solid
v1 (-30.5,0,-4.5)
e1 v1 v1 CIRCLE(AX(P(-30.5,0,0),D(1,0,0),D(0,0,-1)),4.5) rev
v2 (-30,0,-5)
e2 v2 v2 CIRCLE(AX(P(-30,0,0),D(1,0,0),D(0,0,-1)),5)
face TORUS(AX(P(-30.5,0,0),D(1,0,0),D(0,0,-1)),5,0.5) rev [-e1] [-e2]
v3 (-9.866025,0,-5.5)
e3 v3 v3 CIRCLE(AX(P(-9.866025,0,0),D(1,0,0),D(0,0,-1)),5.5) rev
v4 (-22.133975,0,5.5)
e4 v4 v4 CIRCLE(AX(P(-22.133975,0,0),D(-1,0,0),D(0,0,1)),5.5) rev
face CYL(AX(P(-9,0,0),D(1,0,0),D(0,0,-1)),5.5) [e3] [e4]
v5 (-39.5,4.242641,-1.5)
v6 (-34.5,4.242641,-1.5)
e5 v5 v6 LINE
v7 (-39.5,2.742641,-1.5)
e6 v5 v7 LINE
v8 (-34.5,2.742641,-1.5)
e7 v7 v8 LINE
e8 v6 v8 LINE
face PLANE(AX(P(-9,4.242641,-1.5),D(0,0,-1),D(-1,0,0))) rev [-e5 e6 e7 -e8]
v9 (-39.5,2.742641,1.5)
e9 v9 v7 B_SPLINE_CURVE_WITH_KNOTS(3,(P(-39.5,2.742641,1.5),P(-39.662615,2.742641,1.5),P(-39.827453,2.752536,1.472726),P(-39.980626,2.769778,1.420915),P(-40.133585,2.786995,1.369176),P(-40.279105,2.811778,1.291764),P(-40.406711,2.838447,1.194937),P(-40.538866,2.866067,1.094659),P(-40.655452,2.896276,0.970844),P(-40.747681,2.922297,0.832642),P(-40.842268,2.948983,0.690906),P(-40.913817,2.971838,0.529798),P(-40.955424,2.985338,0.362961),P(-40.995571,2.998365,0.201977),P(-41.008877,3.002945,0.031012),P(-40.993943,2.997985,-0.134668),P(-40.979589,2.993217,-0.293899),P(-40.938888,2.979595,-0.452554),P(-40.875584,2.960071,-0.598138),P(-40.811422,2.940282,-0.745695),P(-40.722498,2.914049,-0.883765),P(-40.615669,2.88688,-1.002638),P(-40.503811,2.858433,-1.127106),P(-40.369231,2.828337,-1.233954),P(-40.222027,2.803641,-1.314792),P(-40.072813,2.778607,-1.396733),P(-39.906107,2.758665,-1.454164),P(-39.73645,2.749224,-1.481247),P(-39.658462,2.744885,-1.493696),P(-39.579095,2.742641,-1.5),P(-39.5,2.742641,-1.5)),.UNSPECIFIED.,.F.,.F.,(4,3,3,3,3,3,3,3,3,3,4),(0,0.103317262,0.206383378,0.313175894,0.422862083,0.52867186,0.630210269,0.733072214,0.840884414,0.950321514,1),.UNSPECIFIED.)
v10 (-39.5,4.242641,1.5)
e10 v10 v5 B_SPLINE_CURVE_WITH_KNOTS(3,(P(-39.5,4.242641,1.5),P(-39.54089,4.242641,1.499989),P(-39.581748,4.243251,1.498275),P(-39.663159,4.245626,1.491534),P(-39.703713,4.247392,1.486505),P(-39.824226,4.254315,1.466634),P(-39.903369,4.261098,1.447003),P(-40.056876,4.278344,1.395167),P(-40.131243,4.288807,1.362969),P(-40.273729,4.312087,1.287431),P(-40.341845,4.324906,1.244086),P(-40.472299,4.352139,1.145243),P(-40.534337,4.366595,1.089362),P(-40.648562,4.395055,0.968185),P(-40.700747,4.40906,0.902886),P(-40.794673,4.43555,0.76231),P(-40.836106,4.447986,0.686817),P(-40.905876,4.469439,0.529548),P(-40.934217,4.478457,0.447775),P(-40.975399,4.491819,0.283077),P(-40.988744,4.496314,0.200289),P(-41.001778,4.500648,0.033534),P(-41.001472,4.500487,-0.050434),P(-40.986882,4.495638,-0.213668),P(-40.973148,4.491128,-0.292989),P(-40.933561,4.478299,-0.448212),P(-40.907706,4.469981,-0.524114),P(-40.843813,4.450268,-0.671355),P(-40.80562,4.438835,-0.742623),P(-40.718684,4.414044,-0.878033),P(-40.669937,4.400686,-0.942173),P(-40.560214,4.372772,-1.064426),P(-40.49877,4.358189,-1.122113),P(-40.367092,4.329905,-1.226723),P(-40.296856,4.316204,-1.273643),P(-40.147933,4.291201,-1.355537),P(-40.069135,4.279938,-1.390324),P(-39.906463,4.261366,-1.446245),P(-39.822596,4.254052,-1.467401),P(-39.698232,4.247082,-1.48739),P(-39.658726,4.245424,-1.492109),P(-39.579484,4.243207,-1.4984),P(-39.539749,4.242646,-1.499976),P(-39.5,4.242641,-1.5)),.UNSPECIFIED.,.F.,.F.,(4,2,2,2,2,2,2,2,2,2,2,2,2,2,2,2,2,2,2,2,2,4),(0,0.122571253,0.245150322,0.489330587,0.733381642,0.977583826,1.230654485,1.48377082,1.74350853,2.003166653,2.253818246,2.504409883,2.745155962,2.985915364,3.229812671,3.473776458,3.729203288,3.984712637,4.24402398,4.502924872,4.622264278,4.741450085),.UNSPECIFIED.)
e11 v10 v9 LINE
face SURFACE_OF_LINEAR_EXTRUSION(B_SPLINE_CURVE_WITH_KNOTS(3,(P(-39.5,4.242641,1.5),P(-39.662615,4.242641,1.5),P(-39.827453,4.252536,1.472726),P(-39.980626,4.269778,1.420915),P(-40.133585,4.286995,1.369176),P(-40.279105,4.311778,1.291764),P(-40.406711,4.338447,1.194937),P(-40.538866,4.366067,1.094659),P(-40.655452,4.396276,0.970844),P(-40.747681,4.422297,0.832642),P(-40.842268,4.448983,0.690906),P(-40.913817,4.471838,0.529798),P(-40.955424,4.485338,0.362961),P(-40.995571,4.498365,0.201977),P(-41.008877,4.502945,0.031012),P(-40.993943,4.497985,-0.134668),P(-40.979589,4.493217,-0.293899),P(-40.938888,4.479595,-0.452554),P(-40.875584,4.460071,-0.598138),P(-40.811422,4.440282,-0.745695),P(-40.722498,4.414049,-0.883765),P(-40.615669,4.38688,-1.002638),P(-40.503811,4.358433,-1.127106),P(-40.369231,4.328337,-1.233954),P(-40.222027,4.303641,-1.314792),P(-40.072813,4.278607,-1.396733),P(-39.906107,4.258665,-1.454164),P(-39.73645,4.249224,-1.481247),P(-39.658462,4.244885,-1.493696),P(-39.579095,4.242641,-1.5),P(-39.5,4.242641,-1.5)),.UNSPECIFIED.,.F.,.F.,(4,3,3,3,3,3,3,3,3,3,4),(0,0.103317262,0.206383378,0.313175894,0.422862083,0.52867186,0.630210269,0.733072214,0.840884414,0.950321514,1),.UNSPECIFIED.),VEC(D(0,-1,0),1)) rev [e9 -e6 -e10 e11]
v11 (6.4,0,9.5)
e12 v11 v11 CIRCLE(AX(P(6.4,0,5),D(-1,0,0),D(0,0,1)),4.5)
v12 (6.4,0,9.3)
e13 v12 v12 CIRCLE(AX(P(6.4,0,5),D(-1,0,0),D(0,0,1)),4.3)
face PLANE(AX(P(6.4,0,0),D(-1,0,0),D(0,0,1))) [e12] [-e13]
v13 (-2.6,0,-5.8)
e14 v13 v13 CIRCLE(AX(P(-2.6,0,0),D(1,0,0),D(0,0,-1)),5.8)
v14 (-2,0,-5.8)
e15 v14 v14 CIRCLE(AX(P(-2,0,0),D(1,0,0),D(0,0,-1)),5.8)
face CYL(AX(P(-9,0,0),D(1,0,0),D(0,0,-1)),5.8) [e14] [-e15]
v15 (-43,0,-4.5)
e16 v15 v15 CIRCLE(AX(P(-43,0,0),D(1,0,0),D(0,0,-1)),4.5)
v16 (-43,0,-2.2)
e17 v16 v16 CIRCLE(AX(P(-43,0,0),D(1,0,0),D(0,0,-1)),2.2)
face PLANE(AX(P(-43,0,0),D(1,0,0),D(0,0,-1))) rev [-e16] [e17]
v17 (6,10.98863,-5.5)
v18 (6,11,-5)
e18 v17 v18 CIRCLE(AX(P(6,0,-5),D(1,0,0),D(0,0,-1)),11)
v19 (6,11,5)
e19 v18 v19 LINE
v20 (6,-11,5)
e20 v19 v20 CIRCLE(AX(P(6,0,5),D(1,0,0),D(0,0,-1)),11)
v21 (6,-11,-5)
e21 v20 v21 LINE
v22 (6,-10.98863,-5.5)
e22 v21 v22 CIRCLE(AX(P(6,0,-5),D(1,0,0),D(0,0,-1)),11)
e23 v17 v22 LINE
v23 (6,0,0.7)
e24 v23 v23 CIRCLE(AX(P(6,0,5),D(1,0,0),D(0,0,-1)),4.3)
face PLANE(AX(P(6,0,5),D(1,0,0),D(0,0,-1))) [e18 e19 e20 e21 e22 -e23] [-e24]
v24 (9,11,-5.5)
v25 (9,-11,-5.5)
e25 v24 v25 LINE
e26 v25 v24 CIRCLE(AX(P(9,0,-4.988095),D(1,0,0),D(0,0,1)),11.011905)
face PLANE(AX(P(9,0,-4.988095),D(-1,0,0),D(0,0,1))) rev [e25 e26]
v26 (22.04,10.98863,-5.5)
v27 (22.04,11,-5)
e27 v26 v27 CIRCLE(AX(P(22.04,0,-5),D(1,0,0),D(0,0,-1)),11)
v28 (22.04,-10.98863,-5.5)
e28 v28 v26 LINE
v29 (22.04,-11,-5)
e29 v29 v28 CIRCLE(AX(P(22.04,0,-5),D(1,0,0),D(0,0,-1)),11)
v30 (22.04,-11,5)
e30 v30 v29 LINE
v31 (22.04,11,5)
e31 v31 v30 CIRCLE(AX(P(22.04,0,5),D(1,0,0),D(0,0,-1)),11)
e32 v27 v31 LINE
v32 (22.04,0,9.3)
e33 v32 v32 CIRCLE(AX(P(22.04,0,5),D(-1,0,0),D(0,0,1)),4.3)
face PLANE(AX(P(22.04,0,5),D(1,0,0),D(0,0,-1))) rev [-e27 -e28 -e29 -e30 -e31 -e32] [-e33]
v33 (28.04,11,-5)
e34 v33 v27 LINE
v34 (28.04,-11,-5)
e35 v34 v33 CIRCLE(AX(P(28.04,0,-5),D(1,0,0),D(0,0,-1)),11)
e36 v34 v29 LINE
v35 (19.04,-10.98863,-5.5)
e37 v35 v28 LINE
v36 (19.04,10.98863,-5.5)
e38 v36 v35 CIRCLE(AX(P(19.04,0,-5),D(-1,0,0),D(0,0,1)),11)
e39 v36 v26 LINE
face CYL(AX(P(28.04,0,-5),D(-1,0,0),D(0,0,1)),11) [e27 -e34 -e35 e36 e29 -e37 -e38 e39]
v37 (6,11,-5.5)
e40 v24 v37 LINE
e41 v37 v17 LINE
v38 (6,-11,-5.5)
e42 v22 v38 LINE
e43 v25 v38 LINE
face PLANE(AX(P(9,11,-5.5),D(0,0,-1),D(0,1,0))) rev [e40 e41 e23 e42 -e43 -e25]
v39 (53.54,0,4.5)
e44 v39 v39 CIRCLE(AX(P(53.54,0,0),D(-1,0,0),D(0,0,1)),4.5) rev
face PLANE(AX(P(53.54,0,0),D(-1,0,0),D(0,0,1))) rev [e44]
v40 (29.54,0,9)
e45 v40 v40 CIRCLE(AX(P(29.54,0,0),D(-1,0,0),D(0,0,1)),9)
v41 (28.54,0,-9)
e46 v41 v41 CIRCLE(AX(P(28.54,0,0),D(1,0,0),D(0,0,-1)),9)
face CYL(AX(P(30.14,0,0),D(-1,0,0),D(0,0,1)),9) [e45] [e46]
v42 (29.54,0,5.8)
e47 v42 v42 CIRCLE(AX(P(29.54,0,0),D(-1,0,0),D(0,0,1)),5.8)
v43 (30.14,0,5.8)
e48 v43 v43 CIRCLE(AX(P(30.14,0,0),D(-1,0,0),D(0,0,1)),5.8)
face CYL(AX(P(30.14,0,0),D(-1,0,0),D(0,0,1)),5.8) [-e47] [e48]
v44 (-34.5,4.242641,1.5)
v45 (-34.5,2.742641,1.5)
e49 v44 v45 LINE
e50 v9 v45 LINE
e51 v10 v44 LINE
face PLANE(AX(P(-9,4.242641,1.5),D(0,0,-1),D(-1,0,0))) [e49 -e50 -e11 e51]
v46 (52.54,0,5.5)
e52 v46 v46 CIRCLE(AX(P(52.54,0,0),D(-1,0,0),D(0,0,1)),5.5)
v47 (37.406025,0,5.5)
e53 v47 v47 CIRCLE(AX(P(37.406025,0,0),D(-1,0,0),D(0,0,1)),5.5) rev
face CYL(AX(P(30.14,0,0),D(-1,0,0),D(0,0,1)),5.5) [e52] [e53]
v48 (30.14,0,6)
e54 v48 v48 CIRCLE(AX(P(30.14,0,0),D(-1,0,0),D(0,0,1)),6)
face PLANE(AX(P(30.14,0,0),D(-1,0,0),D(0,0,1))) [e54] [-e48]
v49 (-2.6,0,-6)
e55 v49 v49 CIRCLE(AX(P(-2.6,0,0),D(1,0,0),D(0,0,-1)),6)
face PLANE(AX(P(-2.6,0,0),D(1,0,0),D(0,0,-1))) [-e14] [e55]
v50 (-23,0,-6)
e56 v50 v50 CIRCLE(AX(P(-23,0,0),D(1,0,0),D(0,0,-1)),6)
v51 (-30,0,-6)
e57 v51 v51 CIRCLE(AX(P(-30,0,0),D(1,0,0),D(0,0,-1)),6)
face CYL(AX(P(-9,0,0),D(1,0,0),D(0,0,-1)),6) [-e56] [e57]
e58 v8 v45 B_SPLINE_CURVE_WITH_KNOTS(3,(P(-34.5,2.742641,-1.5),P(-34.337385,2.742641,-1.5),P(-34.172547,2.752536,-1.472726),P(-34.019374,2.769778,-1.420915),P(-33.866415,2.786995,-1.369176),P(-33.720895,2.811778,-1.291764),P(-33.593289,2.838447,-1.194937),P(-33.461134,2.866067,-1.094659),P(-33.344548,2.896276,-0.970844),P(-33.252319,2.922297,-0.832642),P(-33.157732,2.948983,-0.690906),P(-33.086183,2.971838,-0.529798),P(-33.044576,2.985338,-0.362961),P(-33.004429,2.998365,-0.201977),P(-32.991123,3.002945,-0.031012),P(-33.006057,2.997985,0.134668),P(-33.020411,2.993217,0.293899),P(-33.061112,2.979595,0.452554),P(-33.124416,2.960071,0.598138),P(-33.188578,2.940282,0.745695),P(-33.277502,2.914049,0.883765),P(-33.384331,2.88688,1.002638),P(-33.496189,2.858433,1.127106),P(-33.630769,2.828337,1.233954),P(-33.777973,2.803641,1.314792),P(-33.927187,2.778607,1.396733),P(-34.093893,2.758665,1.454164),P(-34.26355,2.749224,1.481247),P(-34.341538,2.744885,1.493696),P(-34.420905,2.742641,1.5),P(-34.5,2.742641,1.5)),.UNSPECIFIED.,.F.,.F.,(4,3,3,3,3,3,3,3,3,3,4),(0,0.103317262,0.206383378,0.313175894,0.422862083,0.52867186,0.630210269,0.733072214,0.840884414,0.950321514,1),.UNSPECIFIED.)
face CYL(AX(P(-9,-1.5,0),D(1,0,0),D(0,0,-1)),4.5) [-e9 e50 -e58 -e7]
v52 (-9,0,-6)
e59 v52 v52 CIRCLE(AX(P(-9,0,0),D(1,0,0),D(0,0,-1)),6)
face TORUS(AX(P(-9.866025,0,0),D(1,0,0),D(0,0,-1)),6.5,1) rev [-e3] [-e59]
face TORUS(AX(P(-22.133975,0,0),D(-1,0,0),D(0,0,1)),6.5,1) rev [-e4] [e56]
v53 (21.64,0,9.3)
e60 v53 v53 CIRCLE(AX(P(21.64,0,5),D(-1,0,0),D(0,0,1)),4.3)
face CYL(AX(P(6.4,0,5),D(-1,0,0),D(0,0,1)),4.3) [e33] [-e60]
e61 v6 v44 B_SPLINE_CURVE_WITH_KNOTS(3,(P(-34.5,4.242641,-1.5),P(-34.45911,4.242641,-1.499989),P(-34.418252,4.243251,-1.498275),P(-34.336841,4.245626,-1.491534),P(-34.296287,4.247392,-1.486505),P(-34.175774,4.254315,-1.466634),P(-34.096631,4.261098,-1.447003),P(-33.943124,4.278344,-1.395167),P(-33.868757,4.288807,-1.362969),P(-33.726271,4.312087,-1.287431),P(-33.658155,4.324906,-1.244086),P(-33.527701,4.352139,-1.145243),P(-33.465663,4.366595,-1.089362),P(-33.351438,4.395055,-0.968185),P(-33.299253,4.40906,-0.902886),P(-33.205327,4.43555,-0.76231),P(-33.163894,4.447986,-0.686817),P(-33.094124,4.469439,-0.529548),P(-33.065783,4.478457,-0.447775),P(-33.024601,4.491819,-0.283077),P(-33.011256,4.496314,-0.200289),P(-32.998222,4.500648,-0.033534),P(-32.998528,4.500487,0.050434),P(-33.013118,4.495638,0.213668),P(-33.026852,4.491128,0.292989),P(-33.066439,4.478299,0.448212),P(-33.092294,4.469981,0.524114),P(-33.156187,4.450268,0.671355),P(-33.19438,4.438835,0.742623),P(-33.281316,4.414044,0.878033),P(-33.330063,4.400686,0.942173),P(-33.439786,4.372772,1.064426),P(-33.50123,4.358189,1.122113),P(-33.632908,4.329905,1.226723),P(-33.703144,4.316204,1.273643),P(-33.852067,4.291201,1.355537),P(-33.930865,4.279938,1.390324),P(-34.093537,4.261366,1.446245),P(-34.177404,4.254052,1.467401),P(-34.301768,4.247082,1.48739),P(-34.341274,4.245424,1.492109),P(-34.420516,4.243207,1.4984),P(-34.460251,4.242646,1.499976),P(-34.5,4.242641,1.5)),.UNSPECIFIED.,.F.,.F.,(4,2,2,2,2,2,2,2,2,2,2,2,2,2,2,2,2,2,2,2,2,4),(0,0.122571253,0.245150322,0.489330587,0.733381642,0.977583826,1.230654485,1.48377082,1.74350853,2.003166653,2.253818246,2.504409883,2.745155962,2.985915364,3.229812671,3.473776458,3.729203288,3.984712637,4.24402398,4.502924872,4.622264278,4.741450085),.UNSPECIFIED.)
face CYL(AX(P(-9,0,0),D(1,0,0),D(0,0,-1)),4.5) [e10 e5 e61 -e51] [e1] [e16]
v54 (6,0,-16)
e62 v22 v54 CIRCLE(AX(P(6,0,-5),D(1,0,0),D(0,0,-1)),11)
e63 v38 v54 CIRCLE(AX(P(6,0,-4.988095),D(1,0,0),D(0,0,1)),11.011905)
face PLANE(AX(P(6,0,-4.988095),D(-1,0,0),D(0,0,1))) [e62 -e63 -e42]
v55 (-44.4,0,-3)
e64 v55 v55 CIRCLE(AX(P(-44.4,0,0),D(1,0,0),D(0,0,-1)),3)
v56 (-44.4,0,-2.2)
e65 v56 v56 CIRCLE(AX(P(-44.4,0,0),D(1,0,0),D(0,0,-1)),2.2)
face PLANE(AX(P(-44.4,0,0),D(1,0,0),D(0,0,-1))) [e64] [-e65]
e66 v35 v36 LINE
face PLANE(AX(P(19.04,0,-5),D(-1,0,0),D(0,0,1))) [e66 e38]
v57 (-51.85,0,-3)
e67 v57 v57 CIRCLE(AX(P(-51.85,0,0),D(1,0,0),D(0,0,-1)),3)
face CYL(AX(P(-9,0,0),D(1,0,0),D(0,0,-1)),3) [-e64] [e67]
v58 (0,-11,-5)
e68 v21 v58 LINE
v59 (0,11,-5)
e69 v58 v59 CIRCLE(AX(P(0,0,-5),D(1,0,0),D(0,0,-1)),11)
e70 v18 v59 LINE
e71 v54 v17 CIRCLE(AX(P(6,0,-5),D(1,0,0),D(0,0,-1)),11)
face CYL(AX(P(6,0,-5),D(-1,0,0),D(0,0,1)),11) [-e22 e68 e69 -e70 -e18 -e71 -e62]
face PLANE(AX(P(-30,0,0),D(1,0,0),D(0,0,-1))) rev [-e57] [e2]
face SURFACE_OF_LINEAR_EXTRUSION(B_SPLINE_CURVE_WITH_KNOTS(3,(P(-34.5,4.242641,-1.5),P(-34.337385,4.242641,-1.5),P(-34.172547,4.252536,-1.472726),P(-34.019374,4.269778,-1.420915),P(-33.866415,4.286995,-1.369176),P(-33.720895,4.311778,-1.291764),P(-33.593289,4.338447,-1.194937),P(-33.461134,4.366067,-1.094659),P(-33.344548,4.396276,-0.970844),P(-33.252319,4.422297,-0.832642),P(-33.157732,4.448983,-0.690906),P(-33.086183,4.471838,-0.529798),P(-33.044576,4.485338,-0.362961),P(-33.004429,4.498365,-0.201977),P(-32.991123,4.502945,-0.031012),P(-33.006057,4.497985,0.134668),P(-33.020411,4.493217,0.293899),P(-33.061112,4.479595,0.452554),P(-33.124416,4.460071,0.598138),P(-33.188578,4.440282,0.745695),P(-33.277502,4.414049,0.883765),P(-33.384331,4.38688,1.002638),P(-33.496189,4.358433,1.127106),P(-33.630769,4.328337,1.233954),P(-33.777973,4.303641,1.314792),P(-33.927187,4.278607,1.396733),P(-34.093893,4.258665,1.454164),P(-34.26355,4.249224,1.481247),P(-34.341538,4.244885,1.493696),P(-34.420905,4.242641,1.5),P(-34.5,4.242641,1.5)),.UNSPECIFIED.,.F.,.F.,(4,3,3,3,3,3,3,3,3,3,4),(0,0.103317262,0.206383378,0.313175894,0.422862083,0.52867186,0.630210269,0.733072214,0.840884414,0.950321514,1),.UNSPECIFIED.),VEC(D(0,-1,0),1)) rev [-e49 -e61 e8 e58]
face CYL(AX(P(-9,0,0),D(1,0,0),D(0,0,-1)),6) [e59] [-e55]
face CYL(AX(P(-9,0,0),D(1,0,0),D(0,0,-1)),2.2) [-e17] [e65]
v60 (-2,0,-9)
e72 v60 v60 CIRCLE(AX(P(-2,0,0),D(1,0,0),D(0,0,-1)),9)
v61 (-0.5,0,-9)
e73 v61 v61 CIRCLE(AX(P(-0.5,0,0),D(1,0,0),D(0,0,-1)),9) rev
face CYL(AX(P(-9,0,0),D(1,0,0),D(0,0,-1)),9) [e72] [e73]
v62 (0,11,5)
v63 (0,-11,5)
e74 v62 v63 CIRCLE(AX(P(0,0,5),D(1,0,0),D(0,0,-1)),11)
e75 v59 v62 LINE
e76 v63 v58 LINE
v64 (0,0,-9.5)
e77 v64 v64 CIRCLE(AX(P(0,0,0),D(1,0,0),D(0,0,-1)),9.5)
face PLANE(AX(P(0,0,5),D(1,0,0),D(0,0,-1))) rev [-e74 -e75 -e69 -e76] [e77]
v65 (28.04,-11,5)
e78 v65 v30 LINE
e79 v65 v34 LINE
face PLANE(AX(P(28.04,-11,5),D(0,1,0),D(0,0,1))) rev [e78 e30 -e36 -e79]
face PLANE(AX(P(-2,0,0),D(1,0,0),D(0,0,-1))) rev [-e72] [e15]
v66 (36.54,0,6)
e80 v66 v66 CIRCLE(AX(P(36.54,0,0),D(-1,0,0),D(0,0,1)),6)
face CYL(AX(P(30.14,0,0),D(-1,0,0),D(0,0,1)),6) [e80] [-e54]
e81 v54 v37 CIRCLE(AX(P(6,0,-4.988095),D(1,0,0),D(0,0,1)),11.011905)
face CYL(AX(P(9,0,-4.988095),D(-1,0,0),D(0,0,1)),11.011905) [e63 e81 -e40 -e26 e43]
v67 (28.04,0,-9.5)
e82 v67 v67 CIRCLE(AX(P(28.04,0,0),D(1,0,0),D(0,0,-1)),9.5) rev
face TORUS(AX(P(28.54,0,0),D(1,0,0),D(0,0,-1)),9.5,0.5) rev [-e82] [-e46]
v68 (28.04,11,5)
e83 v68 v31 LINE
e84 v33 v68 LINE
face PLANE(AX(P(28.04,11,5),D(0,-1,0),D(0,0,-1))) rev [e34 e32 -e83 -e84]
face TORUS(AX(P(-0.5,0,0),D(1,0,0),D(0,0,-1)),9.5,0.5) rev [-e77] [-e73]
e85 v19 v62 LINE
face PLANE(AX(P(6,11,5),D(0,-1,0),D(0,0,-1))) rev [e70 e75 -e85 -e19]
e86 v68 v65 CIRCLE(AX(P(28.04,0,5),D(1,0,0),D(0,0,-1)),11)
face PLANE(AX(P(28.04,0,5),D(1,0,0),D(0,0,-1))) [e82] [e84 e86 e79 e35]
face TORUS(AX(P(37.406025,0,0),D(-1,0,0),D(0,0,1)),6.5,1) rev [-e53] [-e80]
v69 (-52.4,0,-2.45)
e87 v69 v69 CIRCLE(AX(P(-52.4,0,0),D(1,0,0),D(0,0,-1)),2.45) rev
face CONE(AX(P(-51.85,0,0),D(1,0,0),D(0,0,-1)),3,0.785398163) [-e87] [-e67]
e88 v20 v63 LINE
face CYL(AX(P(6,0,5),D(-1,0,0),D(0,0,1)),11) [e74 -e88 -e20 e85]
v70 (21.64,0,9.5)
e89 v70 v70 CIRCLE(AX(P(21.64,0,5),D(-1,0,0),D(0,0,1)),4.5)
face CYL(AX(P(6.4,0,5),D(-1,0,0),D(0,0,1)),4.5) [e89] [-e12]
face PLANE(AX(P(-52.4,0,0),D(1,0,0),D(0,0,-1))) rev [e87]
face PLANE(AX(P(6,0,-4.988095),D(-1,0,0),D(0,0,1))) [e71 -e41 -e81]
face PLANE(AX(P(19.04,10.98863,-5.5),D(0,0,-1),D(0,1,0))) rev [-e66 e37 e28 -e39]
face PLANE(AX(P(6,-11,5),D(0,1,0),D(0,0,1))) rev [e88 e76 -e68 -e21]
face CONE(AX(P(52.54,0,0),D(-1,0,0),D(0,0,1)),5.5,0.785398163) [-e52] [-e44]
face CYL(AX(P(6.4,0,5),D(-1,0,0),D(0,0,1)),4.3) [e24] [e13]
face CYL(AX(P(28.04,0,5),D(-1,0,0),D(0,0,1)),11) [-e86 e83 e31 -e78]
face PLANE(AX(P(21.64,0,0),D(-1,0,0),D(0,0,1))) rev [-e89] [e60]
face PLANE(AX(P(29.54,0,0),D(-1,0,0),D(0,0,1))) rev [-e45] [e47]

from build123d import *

# Parameters (mm, degrees)
ESTRUSIONE_ESTRUSIONE1_DEPTH    = 6
SCHIZZO3_W                      = 1.4
SCHIZZO3_H                      = 2.2
SCHIZZO3_W_2                    = 14
SCHIZZO3_H_2                    = 5.5
SCHIZZO3_W_3                    = 2
SCHIZZO3_H_3                    = 9
SCHIZZO3_W_4                    = 0.6
SCHIZZO3_H_4                    = 5.8
SMUSSO1_SIZE                    = 0.55
RACCORDO1_R                     = 0.5
RACCORDO2_R                     = 1
ESTRUSIONE_ESTRUSIONE2_DEPTH    = 3
SCHIZZO5_W                      = 0.4
SCHIZZO5_H                      = 4.3
TAGLIO_ESTRUSIONE1_REACH        = 59.382
TAGLIO_ESTRUSIONE1_START_RADIUS = 4.5
TAGLIO_ESTRUSIONE1_END_RADIUS   = 4.5
ESTRUSIONE_ESTRUSIONE3_DEPTH    = 6
ESTRUSIONE_ESTRUSIONE4_START    = 3
ESTRUSIONE_ESTRUSIONE4_DEPTH    = 3
SCHIZZO11_W                     = 1.5
SCHIZZO11_H                     = 9
SCHIZZO11_W_2                   = 0.6
SCHIZZO11_H_2                   = 5.8
SCHIZZO11_W_3                   = 17
SCHIZZO11_H_3                   = 5.5
SMUSSO3_SIZE                    = 1
RACCORDO3_R                     = 0.5
RACCORDO4_R                     = 1


with BuildPart() as part:
    # Schizzo1 → Estrusione-Estrusione1 (new body)
    with BuildSketch(Plane(origin=(0, 0, 0), x_dir=(0, 0, -1), z_dir=(1, 0, 0))):
        with BuildLine():
            Line((-5, 11), (5, 11))
            ThreePointArc((5, 11), (16, 0), (5, -11))
            Line((5, -11), (-5, -11))
            ThreePointArc((-5, -11), (-16, 0), (-5, 11))
        make_face()
    extrude(amount=ESTRUSIONE_ESTRUSIONE1_DEPTH)

    # Schizzo3 → Rivoluzione1 (revolve)
    with BuildSketch(Plane(origin=(0, 0, 0), x_dir=(1, 0, 0), z_dir=(0, 1, 0)), mode=Mode.PRIVATE) as rivoluzione1_sk:
        Polygon((-44.4, -2.2), (-44.4, 0), (-52.4, 0), (-52.4, -3), (-44.4, -3), align=None)
        Polygon((-30, -4.5), (-30, 0), (-43, 0), (-43, -2.2), (-43, -4.5), align=None)
        with Locations((-43.7, -1.1)):
            Rectangle(SCHIZZO3_W, SCHIZZO3_H)
        Polygon((-23, -5.5), (-23, 0), (-30, 0), (-30, -4.5), (-30, -6), (-23, -6), align=None)
        with Locations((-16, -2.75)):
            Rectangle(SCHIZZO3_W_2, SCHIZZO3_H_2)
        Polygon((-2.6, -5.8), (-2.6, 0), (-9, 0), (-9, -5.5), (-9, -6), (-2.6, -6), align=None)
        with Locations((-1, -4.5)):
            Rectangle(SCHIZZO3_W_3, SCHIZZO3_H_3)
        with Locations((-2.3, -2.9)):
            Rectangle(SCHIZZO3_W_4, SCHIZZO3_H_4)
    revolve(rivoluzione1_sk.sketch.rotate(Axis((-9, 0, 0), (-1, 0, 0)), 180), axis=Axis((-9, 0, 0), (-1, 0, 0)))

    # Smusso1
    smusso1_edges = [part.edges().sort_by_distance(p)[0] for p in [
        (-52.4, 0, 3),
    ]]
    chamfer(smusso1_edges, length=SMUSSO1_SIZE)

    # Raccordo1
    raccordo1_edges = [part.edges().sort_by_distance(p)[0] for p in [
        (-30, 0, 4.5),
        (0, 0, 9),
    ]]
    fillet(raccordo1_edges, radius=RACCORDO1_R)

    # Raccordo2
    # the kernel refuses this fillet: 1 mm, written as the material it adds along each edge
    with BuildSketch(Plane(origin=(-23, 0, 0), x_dir=(0, 0, -1), z_dir=(0, 1, 0))) as raccordo2_piece_1:
        with BuildLine():
            CenterArc((6.5, -0.866025404), RACCORDO2_R, 120, 60)
            Line((5.5, -0.866025404), (5.48, -0.866025404))
            Line((5.48, -0.866025404), (5.48, 0))
            Line((5.48, 0), (5.5, 0.02))
            ThreePointArc((5.5, 0.02), (5.75, 0.02), (5.99, 0.017320508))
            Line((5.99, 0.017320508), (6, 0))
        make_face()
    revolve(axis=Axis((-23, 0, 0), (-1, 0, 0)))
    with BuildSketch(Plane(origin=(-9, 0, 0), x_dir=(0, 0, -1), z_dir=(0, 1, 0))) as raccordo2_piece_2:
        with BuildLine():
            CenterArc((6.5, 0.866025404), RACCORDO2_R, 180, 60)
            Line((6, 0), (5.99, -0.017320508))
            ThreePointArc((5.99, -0.017320508), (5.75, -0.02), (5.5, -0.02))
            Line((5.5, -0.02), (5.48, 0))
            Line((5.48, 0), (5.48, 0.866025404))
            Line((5.48, 0.866025404), (5.5, 0.866025404))
        make_face()
    revolve(axis=Axis((-9, 0, 0), (-1, 0, 0)))

    # Schizzo4 → Estrusione-Estrusione2 (add)
    with BuildSketch(Plane(origin=(6, 0, 0), x_dir=(0, 0, -1), z_dir=(1, 0, 0))):
        with BuildLine():
            Line((5.5, 11), (5.5, -11))
            ThreePointArc((5.5, -11), (16, 0), (5.5, 11))
        make_face()
    extrude(amount=ESTRUSIONE_ESTRUSIONE2_DEPTH)

    # Schizzo5 → Rivoluzione2 (revolve)
    with BuildSketch(Plane(origin=(0, 0, 0), x_dir=(1, 0, 0), z_dir=(0, 1, 0))):
        Polygon((21.64, -5), (6.4, -5), (6.4, -9.3), (6.4, -9.5), (21.64, -9.5), (21.64, -9.3), (21.64, -8), align=None)
        with Locations((6.2, -7.15)):
            Rectangle(SCHIZZO5_W, SCHIZZO5_H)
        Polygon((22.04, -5), (21.64, -5), (21.64, -8), (21.64, -9.3), (22.04, -9.3), align=None)
    revolve(axis=Axis((6.4, 0, 5), (1, 0, 0)))

    # Taglio-Estrusione1: from a cylinder face, 59.382 long prism both ways, kept between that surface and its translate by the depth
    taglio_estrusione1_start = Plane(origin=(-37, 0, 0), z_dir=(1, 0, 0)) * Cylinder(TAGLIO_ESTRUSIONE1_START_RADIUS, 128.764, mode=Mode.PRIVATE)
    taglio_estrusione1_end = Plane(origin=(-37, -1.5, 0), z_dir=(1, 0, 0)) * Cylinder(TAGLIO_ESTRUSIONE1_END_RADIUS, 128.764, mode=Mode.PRIVATE)
    # Schizzo7 → Taglio-Estrusione1 (cut, from a surface)
    with BuildSketch(Plane(origin=(0, 0, 0), x_dir=(1, 0, 0), z_dir=(0, 1, 0)), mode=Mode.PRIVATE) as taglio_estrusione1_sk1:
        with BuildLine():
            Line((-39.5, 1.5), (-34.5, 1.5))
            ThreePointArc((-34.5, 1.5), (-33, 0), (-34.5, -1.5))
            Line((-34.5, -1.5), (-39.5, -1.5))
            ThreePointArc((-39.5, -1.5), (-41, 0), (-39.5, 1.5))
        make_face()
    taglio_estrusione1_tool1 = extrude(taglio_estrusione1_sk1.sketch, amount=TAGLIO_ESTRUSIONE1_REACH, both=True, mode=Mode.PRIVATE)
    add(((taglio_estrusione1_tool1 & taglio_estrusione1_start) - taglio_estrusione1_end).solids().sort_by_distance((-37, 3.492641, 0))[0], mode=Mode.SUBTRACT)

    # Schizzo8 → Estrusione-Estrusione3 (add)
    with BuildSketch(Plane(origin=(22.04, 0, 0), x_dir=(0, 0, -1), z_dir=(1, 0, 0))):
        with BuildLine():
            Line((-5, 11), (5, 11))
            ThreePointArc((5, 11), (16, 0), (5, -11))
            Line((5, -11), (-5, -11))
            ThreePointArc((-5, -11), (-16, 0), (-5, 11))
        make_face()
    extrude(amount=ESTRUSIONE_ESTRUSIONE3_DEPTH)

    # Schizzo9 → Estrusione-Estrusione4 (add)
    with BuildSketch(Plane.ZY.offset(-22.04).offset(ESTRUSIONE_ESTRUSIONE4_START)):
        with BuildLine():
            Line((-5.5, 10.988630488), (-5.5, -10.988630488))
            ThreePointArc((-5.5, -10.988630488), (-16, 0), (-5.5, 10.988630488))
        make_face()
    extrude(amount=-ESTRUSIONE_ESTRUSIONE4_DEPTH)

    # Schizzo11 → Rivoluzione3 (revolve)
    with BuildSketch(Plane(origin=(0, 0, 0), x_dir=(1, 0, 0), z_dir=(0, 1, 0))):
        with Locations((28.79, -4.5)):
            Rectangle(SCHIZZO11_W, SCHIZZO11_H)
        Polygon((36.54, 0), (30.14, 0), (30.14, -5.8), (30.14, -6), (36.54, -6), (36.54, -5.5), align=None)
        with Locations((29.84, -2.9)):
            Rectangle(SCHIZZO11_W_2, SCHIZZO11_H_2)
        with Locations((45.04, -2.75)):
            Rectangle(SCHIZZO11_W_3, SCHIZZO11_H_3)
    revolve(axis=Axis((30.14, 0, 0), (1, 0, 0)))

    # Smusso3
    smusso3_edges = [part.edges().sort_by_distance(p)[0] for p in [
        (53.54, 0, -5.5),
    ]]
    chamfer(smusso3_edges, length=SMUSSO3_SIZE)

    # Raccordo3
    raccordo3_edges = [part.edges().sort_by_distance(p)[0] for p in [
        (28.04, 0, -9),
    ]]
    fillet(raccordo3_edges, radius=RACCORDO3_R)

    # Raccordo4
    # the kernel refuses this fillet: 1 mm, written as the material it adds along each edge
    with BuildSketch(Plane(origin=(36.54, 0, 0), x_dir=(0, 0, 1), z_dir=(0, 1, 0))) as raccordo4_piece_1:
        with BuildLine():
            CenterArc((6.5, 0.866025404), RACCORDO4_R, 180, 60)
            Line((5.5, 0.866025404), (5.48, 0.866025404))
            Line((5.48, 0.866025404), (5.48, 0))
            Line((5.48, 0), (5.5, -0.02))
            ThreePointArc((5.5, -0.02), (5.75, -0.02), (5.99, -0.017320508))
            Line((5.99, -0.017320508), (6, 0))
        make_face()
    revolve(axis=Axis((36.54, 0, 0), (1, 0, 0)))


solid = part.part
